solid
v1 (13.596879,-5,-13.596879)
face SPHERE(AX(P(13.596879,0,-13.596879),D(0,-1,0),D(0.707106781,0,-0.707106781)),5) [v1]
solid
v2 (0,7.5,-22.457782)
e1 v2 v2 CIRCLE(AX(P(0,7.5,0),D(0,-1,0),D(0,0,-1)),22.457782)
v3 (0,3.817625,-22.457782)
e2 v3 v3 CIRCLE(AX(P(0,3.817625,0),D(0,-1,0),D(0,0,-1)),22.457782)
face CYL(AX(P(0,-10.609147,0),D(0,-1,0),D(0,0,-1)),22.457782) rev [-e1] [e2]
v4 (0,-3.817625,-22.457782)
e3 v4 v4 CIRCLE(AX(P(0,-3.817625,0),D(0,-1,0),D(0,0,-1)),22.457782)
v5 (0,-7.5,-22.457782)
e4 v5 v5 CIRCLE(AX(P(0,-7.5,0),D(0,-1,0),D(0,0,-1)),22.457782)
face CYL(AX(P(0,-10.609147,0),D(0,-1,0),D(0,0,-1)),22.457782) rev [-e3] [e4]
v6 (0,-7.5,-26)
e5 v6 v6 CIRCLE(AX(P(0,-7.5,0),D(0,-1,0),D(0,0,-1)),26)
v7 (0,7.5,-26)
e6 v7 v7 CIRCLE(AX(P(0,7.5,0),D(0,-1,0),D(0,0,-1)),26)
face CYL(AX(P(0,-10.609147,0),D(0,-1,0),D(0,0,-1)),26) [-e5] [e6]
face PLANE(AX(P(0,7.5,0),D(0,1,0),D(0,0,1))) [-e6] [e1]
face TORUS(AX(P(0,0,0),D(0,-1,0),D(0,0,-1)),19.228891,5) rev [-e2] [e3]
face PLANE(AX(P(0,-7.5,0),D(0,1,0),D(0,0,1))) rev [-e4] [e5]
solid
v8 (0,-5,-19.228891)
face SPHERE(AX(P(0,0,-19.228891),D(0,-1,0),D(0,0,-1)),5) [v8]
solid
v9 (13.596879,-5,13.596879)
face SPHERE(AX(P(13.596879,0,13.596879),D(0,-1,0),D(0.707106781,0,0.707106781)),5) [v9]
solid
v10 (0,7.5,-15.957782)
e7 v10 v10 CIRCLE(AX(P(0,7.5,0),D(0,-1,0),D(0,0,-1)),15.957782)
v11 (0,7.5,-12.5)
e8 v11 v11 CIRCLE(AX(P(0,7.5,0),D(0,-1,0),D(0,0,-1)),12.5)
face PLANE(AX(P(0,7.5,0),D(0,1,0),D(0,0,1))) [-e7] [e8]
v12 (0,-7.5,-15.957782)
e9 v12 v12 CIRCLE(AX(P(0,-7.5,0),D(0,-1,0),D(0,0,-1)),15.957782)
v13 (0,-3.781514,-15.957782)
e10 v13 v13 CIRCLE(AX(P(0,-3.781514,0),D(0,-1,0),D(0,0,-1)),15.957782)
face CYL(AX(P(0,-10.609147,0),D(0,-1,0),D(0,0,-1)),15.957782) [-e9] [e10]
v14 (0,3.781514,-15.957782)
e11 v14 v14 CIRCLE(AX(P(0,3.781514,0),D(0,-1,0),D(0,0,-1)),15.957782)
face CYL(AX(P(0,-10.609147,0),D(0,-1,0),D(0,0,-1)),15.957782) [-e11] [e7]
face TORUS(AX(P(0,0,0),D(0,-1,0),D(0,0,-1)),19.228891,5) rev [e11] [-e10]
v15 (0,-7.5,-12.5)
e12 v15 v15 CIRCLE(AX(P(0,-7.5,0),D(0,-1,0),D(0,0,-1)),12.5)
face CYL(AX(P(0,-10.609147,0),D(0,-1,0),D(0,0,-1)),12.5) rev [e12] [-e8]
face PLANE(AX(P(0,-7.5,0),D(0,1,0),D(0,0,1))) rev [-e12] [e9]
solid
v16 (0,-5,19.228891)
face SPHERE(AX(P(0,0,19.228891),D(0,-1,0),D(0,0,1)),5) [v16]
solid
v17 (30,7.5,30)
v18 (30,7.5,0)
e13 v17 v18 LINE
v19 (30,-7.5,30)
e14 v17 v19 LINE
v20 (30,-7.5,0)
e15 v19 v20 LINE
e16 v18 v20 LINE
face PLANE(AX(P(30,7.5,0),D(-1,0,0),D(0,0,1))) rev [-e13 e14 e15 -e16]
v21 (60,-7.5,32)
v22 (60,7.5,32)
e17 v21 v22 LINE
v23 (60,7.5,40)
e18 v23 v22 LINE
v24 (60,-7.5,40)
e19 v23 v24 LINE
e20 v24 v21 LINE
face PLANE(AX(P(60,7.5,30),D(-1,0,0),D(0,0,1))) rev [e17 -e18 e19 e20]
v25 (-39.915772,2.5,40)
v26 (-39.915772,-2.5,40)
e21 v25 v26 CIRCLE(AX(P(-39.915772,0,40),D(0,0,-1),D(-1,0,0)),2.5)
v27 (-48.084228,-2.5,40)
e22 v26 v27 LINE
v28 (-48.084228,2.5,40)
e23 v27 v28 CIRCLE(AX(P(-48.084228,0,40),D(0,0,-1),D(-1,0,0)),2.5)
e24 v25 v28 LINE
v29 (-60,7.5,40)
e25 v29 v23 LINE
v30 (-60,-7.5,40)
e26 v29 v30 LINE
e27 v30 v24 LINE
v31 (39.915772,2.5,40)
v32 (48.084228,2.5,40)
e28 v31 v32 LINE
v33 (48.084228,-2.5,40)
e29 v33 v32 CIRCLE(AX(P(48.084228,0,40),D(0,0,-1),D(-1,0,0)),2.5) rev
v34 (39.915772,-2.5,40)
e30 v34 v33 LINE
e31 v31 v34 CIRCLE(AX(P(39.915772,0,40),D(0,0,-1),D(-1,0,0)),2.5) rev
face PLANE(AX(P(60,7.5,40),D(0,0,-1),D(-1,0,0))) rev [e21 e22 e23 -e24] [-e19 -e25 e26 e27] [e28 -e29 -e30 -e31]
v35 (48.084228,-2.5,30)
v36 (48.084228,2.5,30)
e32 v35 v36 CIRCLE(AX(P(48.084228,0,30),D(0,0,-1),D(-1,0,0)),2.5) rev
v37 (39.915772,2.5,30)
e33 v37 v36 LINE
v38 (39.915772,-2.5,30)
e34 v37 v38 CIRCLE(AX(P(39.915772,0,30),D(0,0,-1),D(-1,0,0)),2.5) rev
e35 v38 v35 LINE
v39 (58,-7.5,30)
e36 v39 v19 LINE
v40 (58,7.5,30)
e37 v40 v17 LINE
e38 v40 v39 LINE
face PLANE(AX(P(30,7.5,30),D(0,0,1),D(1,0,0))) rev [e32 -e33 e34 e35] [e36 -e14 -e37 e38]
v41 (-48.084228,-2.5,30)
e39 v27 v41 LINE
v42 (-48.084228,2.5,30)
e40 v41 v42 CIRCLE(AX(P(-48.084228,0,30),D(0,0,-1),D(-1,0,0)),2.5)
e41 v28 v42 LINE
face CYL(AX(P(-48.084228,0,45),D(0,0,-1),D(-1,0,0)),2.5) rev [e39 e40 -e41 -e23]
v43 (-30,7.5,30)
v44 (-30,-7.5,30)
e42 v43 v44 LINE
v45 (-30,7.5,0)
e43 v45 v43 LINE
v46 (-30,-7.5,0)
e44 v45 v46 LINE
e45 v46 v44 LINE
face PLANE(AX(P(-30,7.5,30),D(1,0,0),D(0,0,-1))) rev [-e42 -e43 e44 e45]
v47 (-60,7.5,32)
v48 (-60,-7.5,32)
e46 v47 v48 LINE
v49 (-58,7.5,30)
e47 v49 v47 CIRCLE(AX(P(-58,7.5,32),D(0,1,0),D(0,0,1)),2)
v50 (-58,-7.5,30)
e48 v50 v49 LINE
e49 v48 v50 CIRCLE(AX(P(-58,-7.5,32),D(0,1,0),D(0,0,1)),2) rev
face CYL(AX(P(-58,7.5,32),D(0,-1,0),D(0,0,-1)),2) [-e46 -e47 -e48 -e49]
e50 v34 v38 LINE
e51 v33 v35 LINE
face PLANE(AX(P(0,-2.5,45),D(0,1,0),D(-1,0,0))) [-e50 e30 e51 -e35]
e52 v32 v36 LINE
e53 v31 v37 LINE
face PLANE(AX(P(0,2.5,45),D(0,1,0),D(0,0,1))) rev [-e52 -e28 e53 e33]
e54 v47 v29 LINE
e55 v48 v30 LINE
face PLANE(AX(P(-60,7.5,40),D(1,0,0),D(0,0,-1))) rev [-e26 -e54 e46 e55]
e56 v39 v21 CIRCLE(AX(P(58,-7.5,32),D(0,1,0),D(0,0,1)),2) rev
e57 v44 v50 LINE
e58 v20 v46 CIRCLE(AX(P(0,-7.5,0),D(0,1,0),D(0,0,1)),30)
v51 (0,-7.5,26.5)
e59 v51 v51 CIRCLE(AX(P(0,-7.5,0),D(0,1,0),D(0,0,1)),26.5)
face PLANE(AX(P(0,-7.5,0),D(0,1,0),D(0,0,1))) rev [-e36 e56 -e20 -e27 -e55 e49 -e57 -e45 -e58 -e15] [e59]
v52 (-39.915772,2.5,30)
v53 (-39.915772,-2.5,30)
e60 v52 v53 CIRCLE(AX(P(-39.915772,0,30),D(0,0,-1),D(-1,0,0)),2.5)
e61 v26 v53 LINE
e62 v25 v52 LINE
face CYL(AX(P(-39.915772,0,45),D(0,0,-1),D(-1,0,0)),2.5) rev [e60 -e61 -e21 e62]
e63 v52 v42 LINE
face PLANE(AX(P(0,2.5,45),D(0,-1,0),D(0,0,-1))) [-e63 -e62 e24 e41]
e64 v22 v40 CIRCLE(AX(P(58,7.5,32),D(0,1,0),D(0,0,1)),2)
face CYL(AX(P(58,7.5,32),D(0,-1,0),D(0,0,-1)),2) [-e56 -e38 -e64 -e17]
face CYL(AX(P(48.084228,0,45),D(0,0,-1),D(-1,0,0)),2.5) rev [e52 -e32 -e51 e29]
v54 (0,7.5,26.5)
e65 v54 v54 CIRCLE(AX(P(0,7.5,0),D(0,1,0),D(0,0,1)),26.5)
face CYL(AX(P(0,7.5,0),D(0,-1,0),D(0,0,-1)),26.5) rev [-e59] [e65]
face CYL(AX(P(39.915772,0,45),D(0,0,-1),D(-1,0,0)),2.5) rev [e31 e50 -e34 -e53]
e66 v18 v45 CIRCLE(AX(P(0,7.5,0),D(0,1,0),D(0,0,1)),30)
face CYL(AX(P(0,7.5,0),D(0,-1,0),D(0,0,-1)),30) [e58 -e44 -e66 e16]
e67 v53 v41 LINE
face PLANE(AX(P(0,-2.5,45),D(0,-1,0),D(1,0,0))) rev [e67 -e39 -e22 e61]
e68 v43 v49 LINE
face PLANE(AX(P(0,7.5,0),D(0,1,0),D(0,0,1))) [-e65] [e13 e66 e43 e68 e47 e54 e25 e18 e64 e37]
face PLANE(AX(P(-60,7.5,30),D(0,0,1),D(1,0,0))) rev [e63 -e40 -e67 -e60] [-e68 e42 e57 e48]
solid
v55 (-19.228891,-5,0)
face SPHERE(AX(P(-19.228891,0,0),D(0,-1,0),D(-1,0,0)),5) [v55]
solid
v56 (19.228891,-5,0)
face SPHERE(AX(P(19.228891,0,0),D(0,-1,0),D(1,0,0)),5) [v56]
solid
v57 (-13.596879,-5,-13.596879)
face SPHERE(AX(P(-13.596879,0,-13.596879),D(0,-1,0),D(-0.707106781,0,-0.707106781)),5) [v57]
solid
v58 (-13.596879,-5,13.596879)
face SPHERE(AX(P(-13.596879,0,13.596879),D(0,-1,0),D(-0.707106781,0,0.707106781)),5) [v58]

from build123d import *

# Parameters (mm, degrees)
CIRPATTERN1_COUNT   = 8
SKETCH5_R           = 26.5
BOSS_EXTRUDE2_DEPTH = 7.5
FILLET1_R           = 2
CUT_EXTRUDE1_DEPTH  = 15


with BuildPart() as part:
    # Sketch1 → Revolve1 (revolve)
    with BuildSketch(Plane.XY):
        with BuildLine():
            Line((-19.22889081502279, 4.999999999999999), (-19.22889081502279, -5.000000000000001))
            ThreePointArc((-19.22889081502279, -5), (-17.483549549096534, -4.685486513208093), (-15.957781630045586, -3.7815135461819747))
            ThreePointArc((-15.957781630045586, -3.781513546181975), (-14.22889081502279, -3.3e-16), (-15.957781630045588, 3.781513546181974))
            ThreePointArc((-15.957781630045586, 3.7815135461819738), (-17.483549549096537, 4.685486513208094), (-19.22889081502279, 5))
        make_face()
    revolve(axis=Axis((-19.22889081502279, -5.000000000000001, 0), (0, 1, 0)))

    # Sketch1<4> → Revolve3 (revolve)
    with BuildSketch(Plane.XY):
        with BuildLine():
            ThreePointArc((-15.957781630045588, 3.781513546181974), (-14.22889081502279, -3.3e-16), (-15.957781630045586, -3.781513546181975))
            Line((-15.957781630045586, -3.781513546181975), (-15.957781630045586, -7.499999999999998))
            Line((-15.957781630045586, -7.499999999999998), (-12.499999999999998, -7.499999999999991))
            Line((-12.499999999999998, -7.499999999999992), (-12.5, 7.500000000000008))
            Line((-12.5, 7.500000000000008), (-15.957781630045586, 7.5))
            Line((-15.957781630045586, 7.5), (-15.957781630045586, 3.7815135461819738))
        make_face()
        with BuildLine():
            Line((-22.457781630045584, 7.5), (-25.999999999999996, 7.5000000000000036))
            Line((-25.999999999999996, 7.5000000000000036), (-25.999999999999993, -7.4999999999999964))
            Line((-25.999999999999993, -7.4999999999999964), (-22.457781630045588, -7.5))
            Line((-22.457781630045588, -7.5), (-22.457781630045588, -3.8176254536899545))
            ThreePointArc((-22.457781630045588, -3.817625453689954), (-24.228890815022794, 1.22e-15), (-22.457781630045588, 3.8176254536899554))
            Line((-22.457781630045588, 3.817625453689955), (-22.457781630045584, 7.5))
        make_face()
    revolve(axis=Axis((0, -10.609146633934474, 0), (0, 1, 0)))

    # CirPattern1: part ×8 about axis
    cirpattern1_axis = Axis((0, 0, 0), (0, -1, 0))


with BuildPart() as part_1:
    add(part.part)
    for i in range(1, CIRPATTERN1_COUNT):
        add(part.part.rotate(cirpattern1_axis, i * 360 / CIRPATTERN1_COUNT))


with BuildPart() as body_2:
    # Sketch5 → Boss-Extrude2 (new, symmetric)
    with BuildSketch(Plane(origin=(0, 0, 0), x_dir=(1, 0, 0), z_dir=(0, 1, 0))):
        with BuildLine():
            Line((30, 0), (30, -30))
            Line((30, -30), (60, -30))
            Line((60, -30), (60, -40))
            Line((60, -40), (-59.999999999999986, -40))
            Line((-59.999999999999986, -40), (-59.999999999999986, -30))
            Line((-59.999999999999986, -30), (-30, -30))
            Line((-30, -30), (-30, 0))
            ThreePointArc((-30, 0), (1.84e-15, 30), (30, 0))
        make_face()
        Circle(SKETCH5_R, mode=Mode.SUBTRACT)
    extrude(amount=BOSS_EXTRUDE2_DEPTH, both=True)

    # Fillet1
    fillet1_edges = [body_2.edges().sort_by_distance(p)[0] for p in [
        (60, 0, 30),
        (-59.999999999999986, 0, 30),
    ]]
    fillet(fillet1_edges, radius=FILLET1_R)

    # Sketch6 → Cut-Extrude1 (cut)
    with BuildSketch(Plane(origin=(0, 0, 30), x_dir=(-1, 0, 0), z_dir=(0, 0, -1))):
        with BuildLine():
            Line((48.08422803782548, 2.5000000000000004), (39.915771962174496, 2.5000000000000004))
            ThreePointArc((39.915771962174496, 2.5), (37.415771962174496, 4e-17), (39.915771962174496, -2.5))
            Line((39.915771962174496, -2.5000000000000004), (48.08422803782548, -2.4999999999999996))
            ThreePointArc((48.08422803782548, -2.4999999999999996), (50.58422803782548, 2.9e-16), (48.08422803782548, 2.5000000000000004))
        make_face()
        with BuildLine():
            ThreePointArc((-39.915771962174496, -2.5), (-37.415771962174496, 1.5e-16), (-39.915771962174496, 2.5))
            Line((-39.915771962174496, 2.5000000000000004), (-48.08422803782548, 2.5000000000000004))
            ThreePointArc((-48.08422803782548, 2.5000000000000004), (-50.58422803782548, 2.9e-16), (-48.08422803782548, -2.4999999999999996))
            Line((-48.08422803782548, -2.4999999999999996), (-39.915771962174496, -2.5000000000000004))
        make_face()
    extrude(amount=-CUT_EXTRUDE1_DEPTH, mode=Mode.SUBTRACT)


solid = Compound([part_1.part, body_2.part])
